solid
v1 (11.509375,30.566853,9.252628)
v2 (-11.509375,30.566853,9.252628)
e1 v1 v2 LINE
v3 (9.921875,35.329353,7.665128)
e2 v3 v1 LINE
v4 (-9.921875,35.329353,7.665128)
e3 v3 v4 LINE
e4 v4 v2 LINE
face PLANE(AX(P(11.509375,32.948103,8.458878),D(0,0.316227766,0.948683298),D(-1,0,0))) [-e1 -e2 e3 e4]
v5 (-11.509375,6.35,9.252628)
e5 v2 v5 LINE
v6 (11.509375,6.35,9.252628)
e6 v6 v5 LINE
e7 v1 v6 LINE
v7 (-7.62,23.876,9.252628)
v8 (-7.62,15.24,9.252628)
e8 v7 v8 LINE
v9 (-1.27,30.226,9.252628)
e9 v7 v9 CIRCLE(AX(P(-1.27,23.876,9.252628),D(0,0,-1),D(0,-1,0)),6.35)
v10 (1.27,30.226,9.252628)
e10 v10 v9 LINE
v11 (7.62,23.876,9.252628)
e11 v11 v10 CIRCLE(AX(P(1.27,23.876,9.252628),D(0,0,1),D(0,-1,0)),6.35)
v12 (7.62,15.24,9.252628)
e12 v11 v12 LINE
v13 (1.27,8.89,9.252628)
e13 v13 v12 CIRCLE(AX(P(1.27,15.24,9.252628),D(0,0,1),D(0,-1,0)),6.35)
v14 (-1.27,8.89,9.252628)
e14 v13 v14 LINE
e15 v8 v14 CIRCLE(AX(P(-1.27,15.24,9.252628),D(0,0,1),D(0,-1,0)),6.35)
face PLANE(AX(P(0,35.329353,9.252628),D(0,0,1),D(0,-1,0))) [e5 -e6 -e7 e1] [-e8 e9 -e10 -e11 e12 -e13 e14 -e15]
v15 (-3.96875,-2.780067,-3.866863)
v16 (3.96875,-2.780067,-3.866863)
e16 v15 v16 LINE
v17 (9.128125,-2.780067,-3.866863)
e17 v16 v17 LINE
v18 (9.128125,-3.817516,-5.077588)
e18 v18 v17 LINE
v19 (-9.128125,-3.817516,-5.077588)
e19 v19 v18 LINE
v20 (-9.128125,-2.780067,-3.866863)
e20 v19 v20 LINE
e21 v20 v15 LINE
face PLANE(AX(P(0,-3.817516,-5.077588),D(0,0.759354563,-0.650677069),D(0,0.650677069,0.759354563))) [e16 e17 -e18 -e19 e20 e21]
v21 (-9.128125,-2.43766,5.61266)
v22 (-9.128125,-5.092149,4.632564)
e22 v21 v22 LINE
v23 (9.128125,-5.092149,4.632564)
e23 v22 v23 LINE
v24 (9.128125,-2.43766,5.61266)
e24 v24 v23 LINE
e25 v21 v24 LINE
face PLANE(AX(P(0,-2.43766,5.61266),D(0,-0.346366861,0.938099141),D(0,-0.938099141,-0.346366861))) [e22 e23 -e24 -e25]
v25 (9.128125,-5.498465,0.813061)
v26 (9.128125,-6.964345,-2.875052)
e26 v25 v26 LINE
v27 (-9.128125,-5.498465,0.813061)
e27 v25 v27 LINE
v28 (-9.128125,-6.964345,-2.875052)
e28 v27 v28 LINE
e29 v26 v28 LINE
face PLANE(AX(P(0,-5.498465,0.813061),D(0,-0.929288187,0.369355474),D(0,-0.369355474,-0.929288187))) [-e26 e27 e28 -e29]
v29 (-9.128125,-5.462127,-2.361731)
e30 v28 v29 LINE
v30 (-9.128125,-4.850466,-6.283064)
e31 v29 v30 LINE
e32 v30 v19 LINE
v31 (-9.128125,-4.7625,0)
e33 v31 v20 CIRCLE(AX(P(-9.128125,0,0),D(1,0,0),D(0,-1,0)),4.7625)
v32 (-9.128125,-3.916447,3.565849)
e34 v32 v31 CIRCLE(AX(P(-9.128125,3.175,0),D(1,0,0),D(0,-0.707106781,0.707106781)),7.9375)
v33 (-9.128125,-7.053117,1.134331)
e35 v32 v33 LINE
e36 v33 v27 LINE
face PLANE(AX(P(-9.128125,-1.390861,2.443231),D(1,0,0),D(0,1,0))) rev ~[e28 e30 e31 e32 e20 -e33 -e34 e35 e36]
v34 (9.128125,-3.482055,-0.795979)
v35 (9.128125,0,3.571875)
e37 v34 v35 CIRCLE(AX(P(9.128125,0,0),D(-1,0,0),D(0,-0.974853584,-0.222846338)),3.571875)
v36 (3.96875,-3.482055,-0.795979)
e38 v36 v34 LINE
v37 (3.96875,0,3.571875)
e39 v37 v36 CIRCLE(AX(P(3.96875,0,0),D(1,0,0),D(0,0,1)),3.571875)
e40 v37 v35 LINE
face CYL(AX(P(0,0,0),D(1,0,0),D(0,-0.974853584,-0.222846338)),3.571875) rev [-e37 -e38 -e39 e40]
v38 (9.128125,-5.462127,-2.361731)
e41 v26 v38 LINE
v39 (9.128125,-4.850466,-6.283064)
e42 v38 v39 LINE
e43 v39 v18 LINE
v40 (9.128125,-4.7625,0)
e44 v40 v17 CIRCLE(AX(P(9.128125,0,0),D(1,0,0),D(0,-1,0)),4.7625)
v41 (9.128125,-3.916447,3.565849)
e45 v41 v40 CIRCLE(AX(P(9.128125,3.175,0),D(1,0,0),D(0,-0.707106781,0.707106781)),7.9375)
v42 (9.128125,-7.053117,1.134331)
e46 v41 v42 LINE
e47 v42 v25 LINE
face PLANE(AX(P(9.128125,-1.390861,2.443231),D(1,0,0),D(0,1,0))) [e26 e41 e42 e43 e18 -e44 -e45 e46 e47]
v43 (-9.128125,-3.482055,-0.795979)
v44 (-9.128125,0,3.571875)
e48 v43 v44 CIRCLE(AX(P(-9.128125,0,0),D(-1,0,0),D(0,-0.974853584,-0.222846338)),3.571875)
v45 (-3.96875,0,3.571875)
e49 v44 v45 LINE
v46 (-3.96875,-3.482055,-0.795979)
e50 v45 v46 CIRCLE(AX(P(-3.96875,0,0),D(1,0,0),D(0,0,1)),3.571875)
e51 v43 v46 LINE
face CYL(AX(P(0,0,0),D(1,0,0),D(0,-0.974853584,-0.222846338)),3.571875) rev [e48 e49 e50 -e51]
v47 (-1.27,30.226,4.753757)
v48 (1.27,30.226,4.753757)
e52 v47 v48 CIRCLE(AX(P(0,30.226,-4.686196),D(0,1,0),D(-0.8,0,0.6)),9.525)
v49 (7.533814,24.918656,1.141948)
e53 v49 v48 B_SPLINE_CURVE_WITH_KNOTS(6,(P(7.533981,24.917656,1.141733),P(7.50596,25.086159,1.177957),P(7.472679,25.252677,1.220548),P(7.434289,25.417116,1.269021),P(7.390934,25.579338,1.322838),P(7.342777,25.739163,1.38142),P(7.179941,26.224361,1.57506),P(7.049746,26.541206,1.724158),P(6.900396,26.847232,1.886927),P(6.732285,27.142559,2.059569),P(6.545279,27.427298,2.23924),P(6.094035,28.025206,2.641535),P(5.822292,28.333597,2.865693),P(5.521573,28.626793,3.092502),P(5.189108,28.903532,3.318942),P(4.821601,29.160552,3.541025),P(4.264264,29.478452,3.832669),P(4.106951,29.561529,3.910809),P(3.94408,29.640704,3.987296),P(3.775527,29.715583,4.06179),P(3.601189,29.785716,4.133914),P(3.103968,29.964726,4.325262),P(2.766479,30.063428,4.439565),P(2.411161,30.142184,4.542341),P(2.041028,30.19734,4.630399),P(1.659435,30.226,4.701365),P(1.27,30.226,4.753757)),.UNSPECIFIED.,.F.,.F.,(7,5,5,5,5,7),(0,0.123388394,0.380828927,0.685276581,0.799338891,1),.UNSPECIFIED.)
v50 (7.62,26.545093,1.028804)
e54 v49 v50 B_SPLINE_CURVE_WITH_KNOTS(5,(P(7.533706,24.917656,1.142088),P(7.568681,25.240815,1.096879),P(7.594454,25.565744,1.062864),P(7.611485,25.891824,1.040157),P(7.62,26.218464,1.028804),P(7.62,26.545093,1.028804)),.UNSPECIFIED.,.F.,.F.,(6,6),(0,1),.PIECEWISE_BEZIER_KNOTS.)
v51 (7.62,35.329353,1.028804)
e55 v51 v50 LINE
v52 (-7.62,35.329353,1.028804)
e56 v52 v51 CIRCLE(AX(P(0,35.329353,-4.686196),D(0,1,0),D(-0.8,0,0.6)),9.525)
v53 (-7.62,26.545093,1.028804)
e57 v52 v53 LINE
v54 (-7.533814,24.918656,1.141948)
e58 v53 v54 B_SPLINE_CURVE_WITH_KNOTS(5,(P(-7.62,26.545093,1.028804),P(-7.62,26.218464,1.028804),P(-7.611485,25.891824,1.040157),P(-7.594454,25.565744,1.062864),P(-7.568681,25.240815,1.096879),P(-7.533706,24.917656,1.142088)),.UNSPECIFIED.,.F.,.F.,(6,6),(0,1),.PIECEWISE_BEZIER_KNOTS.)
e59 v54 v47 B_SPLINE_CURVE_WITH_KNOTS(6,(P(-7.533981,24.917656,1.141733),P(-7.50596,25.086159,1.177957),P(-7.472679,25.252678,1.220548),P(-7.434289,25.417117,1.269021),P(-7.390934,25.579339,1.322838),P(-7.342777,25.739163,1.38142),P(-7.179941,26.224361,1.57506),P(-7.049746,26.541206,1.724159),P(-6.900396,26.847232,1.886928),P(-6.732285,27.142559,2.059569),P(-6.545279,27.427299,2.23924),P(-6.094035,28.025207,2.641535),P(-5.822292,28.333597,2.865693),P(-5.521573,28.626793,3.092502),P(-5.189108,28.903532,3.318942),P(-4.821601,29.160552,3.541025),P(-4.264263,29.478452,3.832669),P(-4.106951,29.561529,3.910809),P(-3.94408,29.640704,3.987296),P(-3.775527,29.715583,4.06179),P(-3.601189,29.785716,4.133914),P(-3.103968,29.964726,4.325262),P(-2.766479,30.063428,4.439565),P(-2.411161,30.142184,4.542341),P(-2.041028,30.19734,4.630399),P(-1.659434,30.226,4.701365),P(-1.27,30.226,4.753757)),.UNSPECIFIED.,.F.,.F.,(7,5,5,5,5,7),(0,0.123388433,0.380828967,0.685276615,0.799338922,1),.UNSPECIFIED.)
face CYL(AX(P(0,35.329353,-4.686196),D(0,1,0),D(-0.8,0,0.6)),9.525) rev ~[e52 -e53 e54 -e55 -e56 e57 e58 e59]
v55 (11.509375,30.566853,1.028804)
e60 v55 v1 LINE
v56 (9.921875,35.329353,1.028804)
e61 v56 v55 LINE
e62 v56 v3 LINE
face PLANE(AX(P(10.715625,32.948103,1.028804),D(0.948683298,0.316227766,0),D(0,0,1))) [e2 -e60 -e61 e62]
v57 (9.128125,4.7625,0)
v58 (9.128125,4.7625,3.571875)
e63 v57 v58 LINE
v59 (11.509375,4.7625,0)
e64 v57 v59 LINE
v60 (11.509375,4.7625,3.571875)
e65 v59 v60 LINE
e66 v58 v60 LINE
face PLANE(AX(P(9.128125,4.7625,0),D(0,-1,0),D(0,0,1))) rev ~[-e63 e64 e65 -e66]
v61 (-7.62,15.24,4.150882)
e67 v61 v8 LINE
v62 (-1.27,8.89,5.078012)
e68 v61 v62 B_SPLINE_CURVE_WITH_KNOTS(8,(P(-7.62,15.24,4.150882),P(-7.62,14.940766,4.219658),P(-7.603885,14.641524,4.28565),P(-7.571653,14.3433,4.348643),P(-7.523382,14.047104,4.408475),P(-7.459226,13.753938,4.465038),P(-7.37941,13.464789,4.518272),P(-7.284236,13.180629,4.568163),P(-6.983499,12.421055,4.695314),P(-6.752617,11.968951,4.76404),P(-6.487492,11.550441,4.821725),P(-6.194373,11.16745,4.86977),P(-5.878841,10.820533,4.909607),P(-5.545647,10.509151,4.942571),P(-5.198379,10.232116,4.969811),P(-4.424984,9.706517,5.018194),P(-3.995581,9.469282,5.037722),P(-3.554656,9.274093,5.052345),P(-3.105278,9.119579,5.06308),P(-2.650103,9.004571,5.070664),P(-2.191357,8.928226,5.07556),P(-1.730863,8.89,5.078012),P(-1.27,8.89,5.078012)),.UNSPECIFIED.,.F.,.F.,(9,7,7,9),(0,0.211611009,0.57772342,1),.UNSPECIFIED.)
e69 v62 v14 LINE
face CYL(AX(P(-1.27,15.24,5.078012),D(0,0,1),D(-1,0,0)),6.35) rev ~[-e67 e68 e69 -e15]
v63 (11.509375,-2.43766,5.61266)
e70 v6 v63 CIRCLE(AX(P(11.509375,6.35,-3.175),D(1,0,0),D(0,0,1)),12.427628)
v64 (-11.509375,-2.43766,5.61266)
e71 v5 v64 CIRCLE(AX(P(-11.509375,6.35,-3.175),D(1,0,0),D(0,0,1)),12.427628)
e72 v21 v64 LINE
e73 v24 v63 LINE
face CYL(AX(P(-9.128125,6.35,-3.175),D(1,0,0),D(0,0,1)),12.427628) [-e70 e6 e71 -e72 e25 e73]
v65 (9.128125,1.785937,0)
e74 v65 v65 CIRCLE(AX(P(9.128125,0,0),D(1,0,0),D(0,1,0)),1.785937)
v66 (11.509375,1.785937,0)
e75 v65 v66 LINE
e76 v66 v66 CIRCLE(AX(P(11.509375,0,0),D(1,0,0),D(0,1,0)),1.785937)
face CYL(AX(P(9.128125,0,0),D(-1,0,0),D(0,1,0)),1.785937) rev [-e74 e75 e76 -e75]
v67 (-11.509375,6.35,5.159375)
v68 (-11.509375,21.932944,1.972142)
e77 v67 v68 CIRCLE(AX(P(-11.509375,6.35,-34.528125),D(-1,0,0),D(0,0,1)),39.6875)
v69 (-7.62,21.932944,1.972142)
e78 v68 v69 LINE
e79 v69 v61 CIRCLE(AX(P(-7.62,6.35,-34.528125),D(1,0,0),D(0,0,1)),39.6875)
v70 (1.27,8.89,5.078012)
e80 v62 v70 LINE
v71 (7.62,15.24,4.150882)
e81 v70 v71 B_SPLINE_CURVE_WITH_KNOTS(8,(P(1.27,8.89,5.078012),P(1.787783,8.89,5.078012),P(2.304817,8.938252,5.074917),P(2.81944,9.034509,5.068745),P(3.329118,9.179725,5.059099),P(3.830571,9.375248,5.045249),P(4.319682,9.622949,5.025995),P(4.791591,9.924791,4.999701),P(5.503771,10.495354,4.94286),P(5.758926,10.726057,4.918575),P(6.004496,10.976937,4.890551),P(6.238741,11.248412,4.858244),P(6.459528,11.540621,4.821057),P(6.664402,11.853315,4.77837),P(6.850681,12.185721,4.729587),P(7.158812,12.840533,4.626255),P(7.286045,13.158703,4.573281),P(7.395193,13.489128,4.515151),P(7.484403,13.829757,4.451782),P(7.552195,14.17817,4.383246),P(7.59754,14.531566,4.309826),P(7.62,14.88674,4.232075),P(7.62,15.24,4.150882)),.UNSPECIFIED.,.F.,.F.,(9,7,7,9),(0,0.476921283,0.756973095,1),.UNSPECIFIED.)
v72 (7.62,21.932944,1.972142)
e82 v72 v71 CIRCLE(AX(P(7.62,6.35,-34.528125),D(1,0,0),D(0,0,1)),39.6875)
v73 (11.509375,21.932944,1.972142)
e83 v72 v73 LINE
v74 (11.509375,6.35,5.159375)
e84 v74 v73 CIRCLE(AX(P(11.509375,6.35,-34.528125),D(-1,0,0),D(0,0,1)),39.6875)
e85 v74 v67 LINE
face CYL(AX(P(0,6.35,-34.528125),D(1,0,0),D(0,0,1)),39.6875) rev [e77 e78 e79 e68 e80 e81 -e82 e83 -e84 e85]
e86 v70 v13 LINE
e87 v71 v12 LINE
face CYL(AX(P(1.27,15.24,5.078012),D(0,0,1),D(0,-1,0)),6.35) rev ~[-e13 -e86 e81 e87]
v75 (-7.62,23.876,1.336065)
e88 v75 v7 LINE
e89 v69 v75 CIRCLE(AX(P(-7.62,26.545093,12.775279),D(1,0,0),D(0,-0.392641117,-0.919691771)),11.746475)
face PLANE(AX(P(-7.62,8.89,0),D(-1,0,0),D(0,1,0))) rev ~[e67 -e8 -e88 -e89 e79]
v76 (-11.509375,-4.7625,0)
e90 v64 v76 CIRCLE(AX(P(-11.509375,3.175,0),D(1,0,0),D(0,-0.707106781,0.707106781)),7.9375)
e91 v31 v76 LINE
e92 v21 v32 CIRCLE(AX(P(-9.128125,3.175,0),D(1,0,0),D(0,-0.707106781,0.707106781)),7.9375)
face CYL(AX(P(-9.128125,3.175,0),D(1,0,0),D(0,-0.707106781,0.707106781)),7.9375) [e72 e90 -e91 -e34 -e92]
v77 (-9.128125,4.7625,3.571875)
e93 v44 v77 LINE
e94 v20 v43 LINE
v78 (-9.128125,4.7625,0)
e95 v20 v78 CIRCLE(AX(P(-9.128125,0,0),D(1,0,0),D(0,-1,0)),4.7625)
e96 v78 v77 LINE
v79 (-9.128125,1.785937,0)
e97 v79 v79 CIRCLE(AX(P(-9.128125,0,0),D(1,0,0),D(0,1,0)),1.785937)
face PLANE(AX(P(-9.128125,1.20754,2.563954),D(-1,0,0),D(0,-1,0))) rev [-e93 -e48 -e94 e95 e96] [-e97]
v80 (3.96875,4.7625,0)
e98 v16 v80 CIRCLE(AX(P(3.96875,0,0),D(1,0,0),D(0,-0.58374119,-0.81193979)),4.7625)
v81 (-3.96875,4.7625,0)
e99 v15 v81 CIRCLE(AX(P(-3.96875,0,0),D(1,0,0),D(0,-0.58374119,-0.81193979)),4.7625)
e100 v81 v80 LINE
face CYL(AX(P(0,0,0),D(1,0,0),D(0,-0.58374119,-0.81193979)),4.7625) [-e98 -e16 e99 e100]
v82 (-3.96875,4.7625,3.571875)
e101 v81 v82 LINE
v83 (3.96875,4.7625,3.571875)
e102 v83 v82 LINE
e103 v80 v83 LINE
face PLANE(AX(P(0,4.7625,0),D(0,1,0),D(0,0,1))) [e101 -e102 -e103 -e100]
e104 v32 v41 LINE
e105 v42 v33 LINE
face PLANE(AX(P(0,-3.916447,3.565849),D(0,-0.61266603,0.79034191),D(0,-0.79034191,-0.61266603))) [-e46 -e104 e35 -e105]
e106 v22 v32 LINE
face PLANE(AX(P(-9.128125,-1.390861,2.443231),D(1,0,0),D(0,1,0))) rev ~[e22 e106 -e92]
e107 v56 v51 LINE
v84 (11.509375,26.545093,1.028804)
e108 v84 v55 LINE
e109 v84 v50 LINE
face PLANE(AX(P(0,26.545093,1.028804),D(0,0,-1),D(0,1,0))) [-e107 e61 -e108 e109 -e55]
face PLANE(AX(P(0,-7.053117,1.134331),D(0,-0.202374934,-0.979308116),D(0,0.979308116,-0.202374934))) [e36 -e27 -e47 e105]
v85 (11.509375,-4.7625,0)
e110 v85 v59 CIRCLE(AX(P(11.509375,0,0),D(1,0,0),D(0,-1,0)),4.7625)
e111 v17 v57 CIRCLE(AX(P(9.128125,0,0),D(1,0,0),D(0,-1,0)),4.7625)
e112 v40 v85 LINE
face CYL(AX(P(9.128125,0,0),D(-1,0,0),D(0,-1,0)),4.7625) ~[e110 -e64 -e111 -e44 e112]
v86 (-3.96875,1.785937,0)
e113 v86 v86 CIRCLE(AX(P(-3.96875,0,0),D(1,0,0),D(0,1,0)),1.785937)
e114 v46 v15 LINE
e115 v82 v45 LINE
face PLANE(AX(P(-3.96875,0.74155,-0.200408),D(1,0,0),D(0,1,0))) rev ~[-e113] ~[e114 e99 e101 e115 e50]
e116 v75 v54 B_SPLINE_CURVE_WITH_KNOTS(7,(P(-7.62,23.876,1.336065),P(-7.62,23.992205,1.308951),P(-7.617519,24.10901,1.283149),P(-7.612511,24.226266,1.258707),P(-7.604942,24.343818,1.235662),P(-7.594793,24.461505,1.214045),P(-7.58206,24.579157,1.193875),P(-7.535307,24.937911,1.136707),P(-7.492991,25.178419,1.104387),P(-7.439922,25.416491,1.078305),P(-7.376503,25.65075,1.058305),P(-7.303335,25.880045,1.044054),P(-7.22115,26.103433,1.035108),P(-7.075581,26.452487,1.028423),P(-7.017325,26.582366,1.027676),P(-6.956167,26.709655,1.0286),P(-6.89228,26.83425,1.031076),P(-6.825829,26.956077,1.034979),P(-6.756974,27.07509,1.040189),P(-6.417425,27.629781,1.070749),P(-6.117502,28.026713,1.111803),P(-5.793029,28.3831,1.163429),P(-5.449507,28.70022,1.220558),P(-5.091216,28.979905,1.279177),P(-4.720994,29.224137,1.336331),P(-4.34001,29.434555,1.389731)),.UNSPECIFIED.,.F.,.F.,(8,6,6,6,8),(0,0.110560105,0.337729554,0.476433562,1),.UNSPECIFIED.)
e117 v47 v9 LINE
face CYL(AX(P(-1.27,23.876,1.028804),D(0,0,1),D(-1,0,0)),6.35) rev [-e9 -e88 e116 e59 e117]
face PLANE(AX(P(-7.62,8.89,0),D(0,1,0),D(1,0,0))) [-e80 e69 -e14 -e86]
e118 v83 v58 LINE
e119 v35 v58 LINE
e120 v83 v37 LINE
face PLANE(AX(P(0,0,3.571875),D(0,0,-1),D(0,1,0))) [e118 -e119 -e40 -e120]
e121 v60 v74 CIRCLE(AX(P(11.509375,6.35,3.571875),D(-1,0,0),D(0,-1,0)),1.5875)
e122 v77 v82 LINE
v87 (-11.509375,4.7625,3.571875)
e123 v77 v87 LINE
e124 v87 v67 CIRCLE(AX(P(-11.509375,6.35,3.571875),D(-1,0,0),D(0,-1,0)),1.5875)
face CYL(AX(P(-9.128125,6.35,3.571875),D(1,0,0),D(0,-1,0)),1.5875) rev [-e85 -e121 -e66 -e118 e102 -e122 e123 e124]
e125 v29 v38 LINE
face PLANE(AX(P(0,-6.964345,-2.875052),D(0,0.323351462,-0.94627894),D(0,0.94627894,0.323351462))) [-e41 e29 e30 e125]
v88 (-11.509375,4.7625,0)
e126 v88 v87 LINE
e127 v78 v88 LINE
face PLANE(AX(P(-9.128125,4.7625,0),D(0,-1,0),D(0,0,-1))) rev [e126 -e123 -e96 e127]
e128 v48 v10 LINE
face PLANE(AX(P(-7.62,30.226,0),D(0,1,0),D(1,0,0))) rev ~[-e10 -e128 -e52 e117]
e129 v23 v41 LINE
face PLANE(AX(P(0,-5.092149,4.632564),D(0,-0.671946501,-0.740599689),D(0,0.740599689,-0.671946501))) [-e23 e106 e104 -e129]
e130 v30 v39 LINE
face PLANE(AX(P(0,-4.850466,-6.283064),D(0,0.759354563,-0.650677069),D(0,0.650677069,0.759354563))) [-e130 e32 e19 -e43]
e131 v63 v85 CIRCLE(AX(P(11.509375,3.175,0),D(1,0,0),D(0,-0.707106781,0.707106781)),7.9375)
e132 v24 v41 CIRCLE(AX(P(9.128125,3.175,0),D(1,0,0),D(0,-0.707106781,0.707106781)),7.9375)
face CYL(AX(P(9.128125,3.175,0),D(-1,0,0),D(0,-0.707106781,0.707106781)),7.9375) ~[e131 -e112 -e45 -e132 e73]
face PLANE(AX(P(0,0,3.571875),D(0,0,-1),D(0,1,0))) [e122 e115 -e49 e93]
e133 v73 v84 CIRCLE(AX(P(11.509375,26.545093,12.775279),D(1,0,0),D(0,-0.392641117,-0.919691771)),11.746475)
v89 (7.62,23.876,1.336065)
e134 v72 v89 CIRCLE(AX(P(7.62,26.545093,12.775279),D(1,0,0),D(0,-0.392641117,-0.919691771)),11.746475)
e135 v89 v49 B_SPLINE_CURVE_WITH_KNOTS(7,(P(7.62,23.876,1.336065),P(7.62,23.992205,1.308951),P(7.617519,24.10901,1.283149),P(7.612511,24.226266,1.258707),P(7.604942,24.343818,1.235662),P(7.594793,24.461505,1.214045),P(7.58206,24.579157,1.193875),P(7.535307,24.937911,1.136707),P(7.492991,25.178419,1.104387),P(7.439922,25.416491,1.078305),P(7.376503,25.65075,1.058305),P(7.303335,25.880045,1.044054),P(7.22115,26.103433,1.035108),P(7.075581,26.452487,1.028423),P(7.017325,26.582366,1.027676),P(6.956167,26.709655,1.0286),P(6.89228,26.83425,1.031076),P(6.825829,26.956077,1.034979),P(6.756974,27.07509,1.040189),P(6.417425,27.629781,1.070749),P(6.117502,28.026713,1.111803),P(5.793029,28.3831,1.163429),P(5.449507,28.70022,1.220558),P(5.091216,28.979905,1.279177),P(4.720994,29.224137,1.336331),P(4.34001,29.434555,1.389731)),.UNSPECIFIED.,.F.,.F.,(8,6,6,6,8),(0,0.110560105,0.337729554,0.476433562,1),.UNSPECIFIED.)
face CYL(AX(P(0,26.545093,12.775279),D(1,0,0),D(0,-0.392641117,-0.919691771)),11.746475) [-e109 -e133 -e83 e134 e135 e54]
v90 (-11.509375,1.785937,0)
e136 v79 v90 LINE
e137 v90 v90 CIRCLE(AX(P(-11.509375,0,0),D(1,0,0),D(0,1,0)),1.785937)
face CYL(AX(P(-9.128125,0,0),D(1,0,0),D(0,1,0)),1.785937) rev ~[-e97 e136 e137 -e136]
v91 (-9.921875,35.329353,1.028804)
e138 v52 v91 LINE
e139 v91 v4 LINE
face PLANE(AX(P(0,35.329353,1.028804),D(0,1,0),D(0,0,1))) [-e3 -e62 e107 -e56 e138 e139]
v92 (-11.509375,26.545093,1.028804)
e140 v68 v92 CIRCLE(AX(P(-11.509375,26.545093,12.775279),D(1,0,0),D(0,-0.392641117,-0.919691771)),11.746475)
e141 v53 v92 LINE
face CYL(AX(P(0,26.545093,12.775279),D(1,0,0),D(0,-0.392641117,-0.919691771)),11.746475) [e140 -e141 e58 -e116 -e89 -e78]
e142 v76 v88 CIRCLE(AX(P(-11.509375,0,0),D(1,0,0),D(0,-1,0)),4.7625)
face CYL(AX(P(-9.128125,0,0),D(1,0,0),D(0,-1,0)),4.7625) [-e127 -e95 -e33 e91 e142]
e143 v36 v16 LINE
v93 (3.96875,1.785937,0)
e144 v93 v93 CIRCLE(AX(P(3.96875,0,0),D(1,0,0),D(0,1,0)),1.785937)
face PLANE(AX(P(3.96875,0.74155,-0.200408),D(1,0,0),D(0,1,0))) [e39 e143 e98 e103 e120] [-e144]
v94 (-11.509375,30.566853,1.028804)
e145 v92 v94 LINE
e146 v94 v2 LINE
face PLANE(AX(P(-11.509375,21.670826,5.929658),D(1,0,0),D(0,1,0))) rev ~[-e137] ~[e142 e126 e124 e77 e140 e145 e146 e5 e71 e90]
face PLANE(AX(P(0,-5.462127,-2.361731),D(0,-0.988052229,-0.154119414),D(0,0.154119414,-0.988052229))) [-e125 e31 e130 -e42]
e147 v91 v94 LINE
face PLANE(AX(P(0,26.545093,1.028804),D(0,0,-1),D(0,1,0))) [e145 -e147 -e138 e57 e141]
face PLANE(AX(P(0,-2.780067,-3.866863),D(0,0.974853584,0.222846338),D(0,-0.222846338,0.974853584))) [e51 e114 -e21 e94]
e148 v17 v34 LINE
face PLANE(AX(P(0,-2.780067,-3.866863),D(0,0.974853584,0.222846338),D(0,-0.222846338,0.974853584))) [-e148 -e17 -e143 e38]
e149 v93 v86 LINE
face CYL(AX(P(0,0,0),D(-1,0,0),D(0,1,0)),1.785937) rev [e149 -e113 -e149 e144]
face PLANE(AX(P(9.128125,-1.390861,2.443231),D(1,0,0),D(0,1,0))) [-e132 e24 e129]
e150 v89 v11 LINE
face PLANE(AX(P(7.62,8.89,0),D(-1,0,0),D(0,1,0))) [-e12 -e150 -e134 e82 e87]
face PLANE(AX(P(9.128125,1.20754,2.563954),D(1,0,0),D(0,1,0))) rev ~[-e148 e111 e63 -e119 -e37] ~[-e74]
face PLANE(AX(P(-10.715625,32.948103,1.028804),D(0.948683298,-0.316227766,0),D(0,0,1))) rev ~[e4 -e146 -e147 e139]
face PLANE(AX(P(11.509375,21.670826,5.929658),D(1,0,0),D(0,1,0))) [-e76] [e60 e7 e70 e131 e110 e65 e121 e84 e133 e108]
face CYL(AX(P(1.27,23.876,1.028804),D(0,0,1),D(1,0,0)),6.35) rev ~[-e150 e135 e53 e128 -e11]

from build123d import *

# Parameters (mm, degrees)
F1_R      = 1.7859375
F2_DEPTH  = 3.96875
F3_DEPTH  = 9.128125
F4_START  = 9.128125
F0_R      = 1.7859375
F4_DEPTH  = 2.38125
F7_DEPTH  = 11.509375
F6_W      = 15.24
F6_H      = 21.336
F8_DEPTH  = 9.2536280605
F9_R      = 6.35
F11_DEPTH = 10.4116969269
F12_SIZE2 = 4.7625
F12_SIZE  = 1.5875


# Not quite as in the source:
# - a feature names something its author has since deleted; it is built from what else it names


with BuildPart() as f2:
    # F1 (on Right) → F2 (new body, symmetric)
    with BuildSketch(Plane.YZ):
        with BuildLine():
            Line((-3.4820551441, -0.7959792641), (-2.7800674169, -3.8668632517))
            ThreePointArc((-2.7800674169, -3.8668632517), (2.1727097341, -4.2380111682), (4.7625, 0))
            Line((4.7625, 0), (4.7625, 3.571875))
            Line((4.7625, 3.571875), (0, 3.571875))
            ThreePointArc((0, 3.571875), (-2.7929759621, 2.2265615399), (-3.4820551441, -0.7959792641))
        make_face()
        Circle(F1_R, mode=Mode.SUBTRACT)
    extrude(amount=F2_DEPTH, both=True)

    # F1 (on Right) → F3 (join, symmetric)
    with BuildSketch(Plane.YZ):
        with BuildLine():
            Line((-6.9643447844, -2.8750519268), (-5.4621269675, -2.3617314805))
            Line((-5.4621269675, -2.3617314805), (-4.8504655451, -6.2830637627))
            Line((-4.8504655451, -6.2830637627), (-3.8175156986, -5.077588394))
            Line((-3.8175156986, -5.077588394), (-2.7800674169, -3.8668632517))
            Line((-2.7800674169, -3.8668632517), (-3.4820551441, -0.7959792641))
            ThreePointArc((-3.4820551441, -0.7959792641), (-2.7929759621, 2.2265615399), (0, 3.571875))
            Line((0, 3.571875), (4.7625, 3.571875))
            ThreePointArc((4.7625, 3.571875), (5.2274679849, 4.6944070151), (6.35, 5.159375))
            Line((6.35, 5.159375), (6.35, 9.2526280605))
            ThreePointArc((6.35, 9.2526280605), (1.5941526376, 8.3066312028), (-2.4376600757, 5.6126600757))
            Line((-2.4376600757, 5.6126600757), (-5.0921494321, 4.6325641503))
            Line((-5.0921494321, 4.6325641503), (-3.9164474257, 3.5658490795))
            Line((-3.9164474257, 3.5658490795), (-7.0531168828, 1.134330772))
            Line((-7.0531168828, 1.134330772), (-5.4984652486, 0.8130605645))
            Line((-5.4984652486, 0.8130605645), (-6.9643447844, -2.8750519268))
        make_face()
    extrude(amount=F3_DEPTH, both=True)

    # F0 (on Right) → F4 (join)
    with BuildSketch(Plane.YZ.offset(F4_START)):
        with BuildLine():
            ThreePointArc((-2.4376600757, 5.6126600757), (-4.1582937893, 3.0375497444), (-4.7625, 0))
            ThreePointArc((-4.7625, 0), (0, -4.7625), (4.7625, 0))
            Line((4.7625, 0), (4.7625, 3.571875))
            ThreePointArc((4.7625, 3.571875), (5.2274679849, 4.6944070151), (6.35, 5.159375))
            Line((6.35, 5.159375), (6.35, 9.2526280605))
            ThreePointArc((6.35, 9.2526280605), (1.5941526376, 8.3066312028), (-2.4376600757, 5.6126600757))
        make_face()
        Circle(F0_R, mode=Mode.SUBTRACT)
    extrude(amount=F4_DEPTH)


with BuildPart() as f5_1:
    # F5: instance of F2
    add(f2.part.mirror(Plane.YZ))


with BuildPart() as f2_1:
    add(f2.part)

    add(f5_1.part)  # F7 merges F5_1
    # F0 (on Right) → F7 (join, symmetric)
    with BuildSketch(Plane.YZ):
        with BuildLine():
            Line((35.3293530643, 9.2526280605), (6.35, 9.2526280605))
            Line((6.35, 9.2526280605), (6.35, 5.159375))
            ThreePointArc((6.35, 5.159375), (14.3027763595, 4.3544032669), (21.9329443326, 1.9721421521))
            ThreePointArc((21.9329443326, 1.9721421521), (24.1912770347, 1.2670543743), (26.5450934892, 1.0288035264))
            Line((26.5450934892, 1.0288035264), (35.3293530643, 1.0288035264))
            Line((35.3293530643, 1.0288035264), (35.3293530643, 9.2526280605))
        make_face()
    extrude(amount=F7_DEPTH, both=True)

    # F6 (on Top) → F8 (cut, through all)
    with BuildSketch(Plane.XY):
        with Locations((0, 19.558)):
            Rectangle(F6_W, F6_H)
    extrude(amount=F8_DEPTH, mode=Mode.SUBTRACT)

    # F9
    f9_edges = [f2_1.edges().sort_by_distance(p)[0] for p in [
        (-7.62, 30.226, 5.140716),
        (7.62, 30.226, 5.140716),
        (7.62, 8.89, 7.16532),
        (-7.62, 8.89, 7.16532),
    ]]
    fillet(f9_edges, radius=F9_R)

    # F10 (on face) → F11 (cut, through all)
    with BuildSketch(Plane(origin=(0, 35.3293530643, 0), x_dir=(-1, 0, 0), z_dir=(0, 1, 0))):
        with BuildLine():
            Line((-7.62, 1.0288035264), (7.62, 1.0288035264))
            ThreePointArc((7.62, 1.0288035264), (0, 4.8388035264), (-7.62, 1.0288035264))
        make_face()
    extrude(amount=-F11_DEPTH, mode=Mode.SUBTRACT)

    # F12
    f12_edges = [f2_1.edges().sort_by_distance(p)[0] for p in [
        (11.509375, 35.329353, 5.140716),
        (-11.509375, 35.329353, 5.140716),
        (0, 35.329353, 9.252628),
    ]]
    f12_side = f2_1.faces().sort_by_distance((0, 35.329353, 5.838802))[0]
    chamfer(f12_edges, length=F12_SIZE, length2=F12_SIZE2, reference=f12_side)


solid = f2_1.part
